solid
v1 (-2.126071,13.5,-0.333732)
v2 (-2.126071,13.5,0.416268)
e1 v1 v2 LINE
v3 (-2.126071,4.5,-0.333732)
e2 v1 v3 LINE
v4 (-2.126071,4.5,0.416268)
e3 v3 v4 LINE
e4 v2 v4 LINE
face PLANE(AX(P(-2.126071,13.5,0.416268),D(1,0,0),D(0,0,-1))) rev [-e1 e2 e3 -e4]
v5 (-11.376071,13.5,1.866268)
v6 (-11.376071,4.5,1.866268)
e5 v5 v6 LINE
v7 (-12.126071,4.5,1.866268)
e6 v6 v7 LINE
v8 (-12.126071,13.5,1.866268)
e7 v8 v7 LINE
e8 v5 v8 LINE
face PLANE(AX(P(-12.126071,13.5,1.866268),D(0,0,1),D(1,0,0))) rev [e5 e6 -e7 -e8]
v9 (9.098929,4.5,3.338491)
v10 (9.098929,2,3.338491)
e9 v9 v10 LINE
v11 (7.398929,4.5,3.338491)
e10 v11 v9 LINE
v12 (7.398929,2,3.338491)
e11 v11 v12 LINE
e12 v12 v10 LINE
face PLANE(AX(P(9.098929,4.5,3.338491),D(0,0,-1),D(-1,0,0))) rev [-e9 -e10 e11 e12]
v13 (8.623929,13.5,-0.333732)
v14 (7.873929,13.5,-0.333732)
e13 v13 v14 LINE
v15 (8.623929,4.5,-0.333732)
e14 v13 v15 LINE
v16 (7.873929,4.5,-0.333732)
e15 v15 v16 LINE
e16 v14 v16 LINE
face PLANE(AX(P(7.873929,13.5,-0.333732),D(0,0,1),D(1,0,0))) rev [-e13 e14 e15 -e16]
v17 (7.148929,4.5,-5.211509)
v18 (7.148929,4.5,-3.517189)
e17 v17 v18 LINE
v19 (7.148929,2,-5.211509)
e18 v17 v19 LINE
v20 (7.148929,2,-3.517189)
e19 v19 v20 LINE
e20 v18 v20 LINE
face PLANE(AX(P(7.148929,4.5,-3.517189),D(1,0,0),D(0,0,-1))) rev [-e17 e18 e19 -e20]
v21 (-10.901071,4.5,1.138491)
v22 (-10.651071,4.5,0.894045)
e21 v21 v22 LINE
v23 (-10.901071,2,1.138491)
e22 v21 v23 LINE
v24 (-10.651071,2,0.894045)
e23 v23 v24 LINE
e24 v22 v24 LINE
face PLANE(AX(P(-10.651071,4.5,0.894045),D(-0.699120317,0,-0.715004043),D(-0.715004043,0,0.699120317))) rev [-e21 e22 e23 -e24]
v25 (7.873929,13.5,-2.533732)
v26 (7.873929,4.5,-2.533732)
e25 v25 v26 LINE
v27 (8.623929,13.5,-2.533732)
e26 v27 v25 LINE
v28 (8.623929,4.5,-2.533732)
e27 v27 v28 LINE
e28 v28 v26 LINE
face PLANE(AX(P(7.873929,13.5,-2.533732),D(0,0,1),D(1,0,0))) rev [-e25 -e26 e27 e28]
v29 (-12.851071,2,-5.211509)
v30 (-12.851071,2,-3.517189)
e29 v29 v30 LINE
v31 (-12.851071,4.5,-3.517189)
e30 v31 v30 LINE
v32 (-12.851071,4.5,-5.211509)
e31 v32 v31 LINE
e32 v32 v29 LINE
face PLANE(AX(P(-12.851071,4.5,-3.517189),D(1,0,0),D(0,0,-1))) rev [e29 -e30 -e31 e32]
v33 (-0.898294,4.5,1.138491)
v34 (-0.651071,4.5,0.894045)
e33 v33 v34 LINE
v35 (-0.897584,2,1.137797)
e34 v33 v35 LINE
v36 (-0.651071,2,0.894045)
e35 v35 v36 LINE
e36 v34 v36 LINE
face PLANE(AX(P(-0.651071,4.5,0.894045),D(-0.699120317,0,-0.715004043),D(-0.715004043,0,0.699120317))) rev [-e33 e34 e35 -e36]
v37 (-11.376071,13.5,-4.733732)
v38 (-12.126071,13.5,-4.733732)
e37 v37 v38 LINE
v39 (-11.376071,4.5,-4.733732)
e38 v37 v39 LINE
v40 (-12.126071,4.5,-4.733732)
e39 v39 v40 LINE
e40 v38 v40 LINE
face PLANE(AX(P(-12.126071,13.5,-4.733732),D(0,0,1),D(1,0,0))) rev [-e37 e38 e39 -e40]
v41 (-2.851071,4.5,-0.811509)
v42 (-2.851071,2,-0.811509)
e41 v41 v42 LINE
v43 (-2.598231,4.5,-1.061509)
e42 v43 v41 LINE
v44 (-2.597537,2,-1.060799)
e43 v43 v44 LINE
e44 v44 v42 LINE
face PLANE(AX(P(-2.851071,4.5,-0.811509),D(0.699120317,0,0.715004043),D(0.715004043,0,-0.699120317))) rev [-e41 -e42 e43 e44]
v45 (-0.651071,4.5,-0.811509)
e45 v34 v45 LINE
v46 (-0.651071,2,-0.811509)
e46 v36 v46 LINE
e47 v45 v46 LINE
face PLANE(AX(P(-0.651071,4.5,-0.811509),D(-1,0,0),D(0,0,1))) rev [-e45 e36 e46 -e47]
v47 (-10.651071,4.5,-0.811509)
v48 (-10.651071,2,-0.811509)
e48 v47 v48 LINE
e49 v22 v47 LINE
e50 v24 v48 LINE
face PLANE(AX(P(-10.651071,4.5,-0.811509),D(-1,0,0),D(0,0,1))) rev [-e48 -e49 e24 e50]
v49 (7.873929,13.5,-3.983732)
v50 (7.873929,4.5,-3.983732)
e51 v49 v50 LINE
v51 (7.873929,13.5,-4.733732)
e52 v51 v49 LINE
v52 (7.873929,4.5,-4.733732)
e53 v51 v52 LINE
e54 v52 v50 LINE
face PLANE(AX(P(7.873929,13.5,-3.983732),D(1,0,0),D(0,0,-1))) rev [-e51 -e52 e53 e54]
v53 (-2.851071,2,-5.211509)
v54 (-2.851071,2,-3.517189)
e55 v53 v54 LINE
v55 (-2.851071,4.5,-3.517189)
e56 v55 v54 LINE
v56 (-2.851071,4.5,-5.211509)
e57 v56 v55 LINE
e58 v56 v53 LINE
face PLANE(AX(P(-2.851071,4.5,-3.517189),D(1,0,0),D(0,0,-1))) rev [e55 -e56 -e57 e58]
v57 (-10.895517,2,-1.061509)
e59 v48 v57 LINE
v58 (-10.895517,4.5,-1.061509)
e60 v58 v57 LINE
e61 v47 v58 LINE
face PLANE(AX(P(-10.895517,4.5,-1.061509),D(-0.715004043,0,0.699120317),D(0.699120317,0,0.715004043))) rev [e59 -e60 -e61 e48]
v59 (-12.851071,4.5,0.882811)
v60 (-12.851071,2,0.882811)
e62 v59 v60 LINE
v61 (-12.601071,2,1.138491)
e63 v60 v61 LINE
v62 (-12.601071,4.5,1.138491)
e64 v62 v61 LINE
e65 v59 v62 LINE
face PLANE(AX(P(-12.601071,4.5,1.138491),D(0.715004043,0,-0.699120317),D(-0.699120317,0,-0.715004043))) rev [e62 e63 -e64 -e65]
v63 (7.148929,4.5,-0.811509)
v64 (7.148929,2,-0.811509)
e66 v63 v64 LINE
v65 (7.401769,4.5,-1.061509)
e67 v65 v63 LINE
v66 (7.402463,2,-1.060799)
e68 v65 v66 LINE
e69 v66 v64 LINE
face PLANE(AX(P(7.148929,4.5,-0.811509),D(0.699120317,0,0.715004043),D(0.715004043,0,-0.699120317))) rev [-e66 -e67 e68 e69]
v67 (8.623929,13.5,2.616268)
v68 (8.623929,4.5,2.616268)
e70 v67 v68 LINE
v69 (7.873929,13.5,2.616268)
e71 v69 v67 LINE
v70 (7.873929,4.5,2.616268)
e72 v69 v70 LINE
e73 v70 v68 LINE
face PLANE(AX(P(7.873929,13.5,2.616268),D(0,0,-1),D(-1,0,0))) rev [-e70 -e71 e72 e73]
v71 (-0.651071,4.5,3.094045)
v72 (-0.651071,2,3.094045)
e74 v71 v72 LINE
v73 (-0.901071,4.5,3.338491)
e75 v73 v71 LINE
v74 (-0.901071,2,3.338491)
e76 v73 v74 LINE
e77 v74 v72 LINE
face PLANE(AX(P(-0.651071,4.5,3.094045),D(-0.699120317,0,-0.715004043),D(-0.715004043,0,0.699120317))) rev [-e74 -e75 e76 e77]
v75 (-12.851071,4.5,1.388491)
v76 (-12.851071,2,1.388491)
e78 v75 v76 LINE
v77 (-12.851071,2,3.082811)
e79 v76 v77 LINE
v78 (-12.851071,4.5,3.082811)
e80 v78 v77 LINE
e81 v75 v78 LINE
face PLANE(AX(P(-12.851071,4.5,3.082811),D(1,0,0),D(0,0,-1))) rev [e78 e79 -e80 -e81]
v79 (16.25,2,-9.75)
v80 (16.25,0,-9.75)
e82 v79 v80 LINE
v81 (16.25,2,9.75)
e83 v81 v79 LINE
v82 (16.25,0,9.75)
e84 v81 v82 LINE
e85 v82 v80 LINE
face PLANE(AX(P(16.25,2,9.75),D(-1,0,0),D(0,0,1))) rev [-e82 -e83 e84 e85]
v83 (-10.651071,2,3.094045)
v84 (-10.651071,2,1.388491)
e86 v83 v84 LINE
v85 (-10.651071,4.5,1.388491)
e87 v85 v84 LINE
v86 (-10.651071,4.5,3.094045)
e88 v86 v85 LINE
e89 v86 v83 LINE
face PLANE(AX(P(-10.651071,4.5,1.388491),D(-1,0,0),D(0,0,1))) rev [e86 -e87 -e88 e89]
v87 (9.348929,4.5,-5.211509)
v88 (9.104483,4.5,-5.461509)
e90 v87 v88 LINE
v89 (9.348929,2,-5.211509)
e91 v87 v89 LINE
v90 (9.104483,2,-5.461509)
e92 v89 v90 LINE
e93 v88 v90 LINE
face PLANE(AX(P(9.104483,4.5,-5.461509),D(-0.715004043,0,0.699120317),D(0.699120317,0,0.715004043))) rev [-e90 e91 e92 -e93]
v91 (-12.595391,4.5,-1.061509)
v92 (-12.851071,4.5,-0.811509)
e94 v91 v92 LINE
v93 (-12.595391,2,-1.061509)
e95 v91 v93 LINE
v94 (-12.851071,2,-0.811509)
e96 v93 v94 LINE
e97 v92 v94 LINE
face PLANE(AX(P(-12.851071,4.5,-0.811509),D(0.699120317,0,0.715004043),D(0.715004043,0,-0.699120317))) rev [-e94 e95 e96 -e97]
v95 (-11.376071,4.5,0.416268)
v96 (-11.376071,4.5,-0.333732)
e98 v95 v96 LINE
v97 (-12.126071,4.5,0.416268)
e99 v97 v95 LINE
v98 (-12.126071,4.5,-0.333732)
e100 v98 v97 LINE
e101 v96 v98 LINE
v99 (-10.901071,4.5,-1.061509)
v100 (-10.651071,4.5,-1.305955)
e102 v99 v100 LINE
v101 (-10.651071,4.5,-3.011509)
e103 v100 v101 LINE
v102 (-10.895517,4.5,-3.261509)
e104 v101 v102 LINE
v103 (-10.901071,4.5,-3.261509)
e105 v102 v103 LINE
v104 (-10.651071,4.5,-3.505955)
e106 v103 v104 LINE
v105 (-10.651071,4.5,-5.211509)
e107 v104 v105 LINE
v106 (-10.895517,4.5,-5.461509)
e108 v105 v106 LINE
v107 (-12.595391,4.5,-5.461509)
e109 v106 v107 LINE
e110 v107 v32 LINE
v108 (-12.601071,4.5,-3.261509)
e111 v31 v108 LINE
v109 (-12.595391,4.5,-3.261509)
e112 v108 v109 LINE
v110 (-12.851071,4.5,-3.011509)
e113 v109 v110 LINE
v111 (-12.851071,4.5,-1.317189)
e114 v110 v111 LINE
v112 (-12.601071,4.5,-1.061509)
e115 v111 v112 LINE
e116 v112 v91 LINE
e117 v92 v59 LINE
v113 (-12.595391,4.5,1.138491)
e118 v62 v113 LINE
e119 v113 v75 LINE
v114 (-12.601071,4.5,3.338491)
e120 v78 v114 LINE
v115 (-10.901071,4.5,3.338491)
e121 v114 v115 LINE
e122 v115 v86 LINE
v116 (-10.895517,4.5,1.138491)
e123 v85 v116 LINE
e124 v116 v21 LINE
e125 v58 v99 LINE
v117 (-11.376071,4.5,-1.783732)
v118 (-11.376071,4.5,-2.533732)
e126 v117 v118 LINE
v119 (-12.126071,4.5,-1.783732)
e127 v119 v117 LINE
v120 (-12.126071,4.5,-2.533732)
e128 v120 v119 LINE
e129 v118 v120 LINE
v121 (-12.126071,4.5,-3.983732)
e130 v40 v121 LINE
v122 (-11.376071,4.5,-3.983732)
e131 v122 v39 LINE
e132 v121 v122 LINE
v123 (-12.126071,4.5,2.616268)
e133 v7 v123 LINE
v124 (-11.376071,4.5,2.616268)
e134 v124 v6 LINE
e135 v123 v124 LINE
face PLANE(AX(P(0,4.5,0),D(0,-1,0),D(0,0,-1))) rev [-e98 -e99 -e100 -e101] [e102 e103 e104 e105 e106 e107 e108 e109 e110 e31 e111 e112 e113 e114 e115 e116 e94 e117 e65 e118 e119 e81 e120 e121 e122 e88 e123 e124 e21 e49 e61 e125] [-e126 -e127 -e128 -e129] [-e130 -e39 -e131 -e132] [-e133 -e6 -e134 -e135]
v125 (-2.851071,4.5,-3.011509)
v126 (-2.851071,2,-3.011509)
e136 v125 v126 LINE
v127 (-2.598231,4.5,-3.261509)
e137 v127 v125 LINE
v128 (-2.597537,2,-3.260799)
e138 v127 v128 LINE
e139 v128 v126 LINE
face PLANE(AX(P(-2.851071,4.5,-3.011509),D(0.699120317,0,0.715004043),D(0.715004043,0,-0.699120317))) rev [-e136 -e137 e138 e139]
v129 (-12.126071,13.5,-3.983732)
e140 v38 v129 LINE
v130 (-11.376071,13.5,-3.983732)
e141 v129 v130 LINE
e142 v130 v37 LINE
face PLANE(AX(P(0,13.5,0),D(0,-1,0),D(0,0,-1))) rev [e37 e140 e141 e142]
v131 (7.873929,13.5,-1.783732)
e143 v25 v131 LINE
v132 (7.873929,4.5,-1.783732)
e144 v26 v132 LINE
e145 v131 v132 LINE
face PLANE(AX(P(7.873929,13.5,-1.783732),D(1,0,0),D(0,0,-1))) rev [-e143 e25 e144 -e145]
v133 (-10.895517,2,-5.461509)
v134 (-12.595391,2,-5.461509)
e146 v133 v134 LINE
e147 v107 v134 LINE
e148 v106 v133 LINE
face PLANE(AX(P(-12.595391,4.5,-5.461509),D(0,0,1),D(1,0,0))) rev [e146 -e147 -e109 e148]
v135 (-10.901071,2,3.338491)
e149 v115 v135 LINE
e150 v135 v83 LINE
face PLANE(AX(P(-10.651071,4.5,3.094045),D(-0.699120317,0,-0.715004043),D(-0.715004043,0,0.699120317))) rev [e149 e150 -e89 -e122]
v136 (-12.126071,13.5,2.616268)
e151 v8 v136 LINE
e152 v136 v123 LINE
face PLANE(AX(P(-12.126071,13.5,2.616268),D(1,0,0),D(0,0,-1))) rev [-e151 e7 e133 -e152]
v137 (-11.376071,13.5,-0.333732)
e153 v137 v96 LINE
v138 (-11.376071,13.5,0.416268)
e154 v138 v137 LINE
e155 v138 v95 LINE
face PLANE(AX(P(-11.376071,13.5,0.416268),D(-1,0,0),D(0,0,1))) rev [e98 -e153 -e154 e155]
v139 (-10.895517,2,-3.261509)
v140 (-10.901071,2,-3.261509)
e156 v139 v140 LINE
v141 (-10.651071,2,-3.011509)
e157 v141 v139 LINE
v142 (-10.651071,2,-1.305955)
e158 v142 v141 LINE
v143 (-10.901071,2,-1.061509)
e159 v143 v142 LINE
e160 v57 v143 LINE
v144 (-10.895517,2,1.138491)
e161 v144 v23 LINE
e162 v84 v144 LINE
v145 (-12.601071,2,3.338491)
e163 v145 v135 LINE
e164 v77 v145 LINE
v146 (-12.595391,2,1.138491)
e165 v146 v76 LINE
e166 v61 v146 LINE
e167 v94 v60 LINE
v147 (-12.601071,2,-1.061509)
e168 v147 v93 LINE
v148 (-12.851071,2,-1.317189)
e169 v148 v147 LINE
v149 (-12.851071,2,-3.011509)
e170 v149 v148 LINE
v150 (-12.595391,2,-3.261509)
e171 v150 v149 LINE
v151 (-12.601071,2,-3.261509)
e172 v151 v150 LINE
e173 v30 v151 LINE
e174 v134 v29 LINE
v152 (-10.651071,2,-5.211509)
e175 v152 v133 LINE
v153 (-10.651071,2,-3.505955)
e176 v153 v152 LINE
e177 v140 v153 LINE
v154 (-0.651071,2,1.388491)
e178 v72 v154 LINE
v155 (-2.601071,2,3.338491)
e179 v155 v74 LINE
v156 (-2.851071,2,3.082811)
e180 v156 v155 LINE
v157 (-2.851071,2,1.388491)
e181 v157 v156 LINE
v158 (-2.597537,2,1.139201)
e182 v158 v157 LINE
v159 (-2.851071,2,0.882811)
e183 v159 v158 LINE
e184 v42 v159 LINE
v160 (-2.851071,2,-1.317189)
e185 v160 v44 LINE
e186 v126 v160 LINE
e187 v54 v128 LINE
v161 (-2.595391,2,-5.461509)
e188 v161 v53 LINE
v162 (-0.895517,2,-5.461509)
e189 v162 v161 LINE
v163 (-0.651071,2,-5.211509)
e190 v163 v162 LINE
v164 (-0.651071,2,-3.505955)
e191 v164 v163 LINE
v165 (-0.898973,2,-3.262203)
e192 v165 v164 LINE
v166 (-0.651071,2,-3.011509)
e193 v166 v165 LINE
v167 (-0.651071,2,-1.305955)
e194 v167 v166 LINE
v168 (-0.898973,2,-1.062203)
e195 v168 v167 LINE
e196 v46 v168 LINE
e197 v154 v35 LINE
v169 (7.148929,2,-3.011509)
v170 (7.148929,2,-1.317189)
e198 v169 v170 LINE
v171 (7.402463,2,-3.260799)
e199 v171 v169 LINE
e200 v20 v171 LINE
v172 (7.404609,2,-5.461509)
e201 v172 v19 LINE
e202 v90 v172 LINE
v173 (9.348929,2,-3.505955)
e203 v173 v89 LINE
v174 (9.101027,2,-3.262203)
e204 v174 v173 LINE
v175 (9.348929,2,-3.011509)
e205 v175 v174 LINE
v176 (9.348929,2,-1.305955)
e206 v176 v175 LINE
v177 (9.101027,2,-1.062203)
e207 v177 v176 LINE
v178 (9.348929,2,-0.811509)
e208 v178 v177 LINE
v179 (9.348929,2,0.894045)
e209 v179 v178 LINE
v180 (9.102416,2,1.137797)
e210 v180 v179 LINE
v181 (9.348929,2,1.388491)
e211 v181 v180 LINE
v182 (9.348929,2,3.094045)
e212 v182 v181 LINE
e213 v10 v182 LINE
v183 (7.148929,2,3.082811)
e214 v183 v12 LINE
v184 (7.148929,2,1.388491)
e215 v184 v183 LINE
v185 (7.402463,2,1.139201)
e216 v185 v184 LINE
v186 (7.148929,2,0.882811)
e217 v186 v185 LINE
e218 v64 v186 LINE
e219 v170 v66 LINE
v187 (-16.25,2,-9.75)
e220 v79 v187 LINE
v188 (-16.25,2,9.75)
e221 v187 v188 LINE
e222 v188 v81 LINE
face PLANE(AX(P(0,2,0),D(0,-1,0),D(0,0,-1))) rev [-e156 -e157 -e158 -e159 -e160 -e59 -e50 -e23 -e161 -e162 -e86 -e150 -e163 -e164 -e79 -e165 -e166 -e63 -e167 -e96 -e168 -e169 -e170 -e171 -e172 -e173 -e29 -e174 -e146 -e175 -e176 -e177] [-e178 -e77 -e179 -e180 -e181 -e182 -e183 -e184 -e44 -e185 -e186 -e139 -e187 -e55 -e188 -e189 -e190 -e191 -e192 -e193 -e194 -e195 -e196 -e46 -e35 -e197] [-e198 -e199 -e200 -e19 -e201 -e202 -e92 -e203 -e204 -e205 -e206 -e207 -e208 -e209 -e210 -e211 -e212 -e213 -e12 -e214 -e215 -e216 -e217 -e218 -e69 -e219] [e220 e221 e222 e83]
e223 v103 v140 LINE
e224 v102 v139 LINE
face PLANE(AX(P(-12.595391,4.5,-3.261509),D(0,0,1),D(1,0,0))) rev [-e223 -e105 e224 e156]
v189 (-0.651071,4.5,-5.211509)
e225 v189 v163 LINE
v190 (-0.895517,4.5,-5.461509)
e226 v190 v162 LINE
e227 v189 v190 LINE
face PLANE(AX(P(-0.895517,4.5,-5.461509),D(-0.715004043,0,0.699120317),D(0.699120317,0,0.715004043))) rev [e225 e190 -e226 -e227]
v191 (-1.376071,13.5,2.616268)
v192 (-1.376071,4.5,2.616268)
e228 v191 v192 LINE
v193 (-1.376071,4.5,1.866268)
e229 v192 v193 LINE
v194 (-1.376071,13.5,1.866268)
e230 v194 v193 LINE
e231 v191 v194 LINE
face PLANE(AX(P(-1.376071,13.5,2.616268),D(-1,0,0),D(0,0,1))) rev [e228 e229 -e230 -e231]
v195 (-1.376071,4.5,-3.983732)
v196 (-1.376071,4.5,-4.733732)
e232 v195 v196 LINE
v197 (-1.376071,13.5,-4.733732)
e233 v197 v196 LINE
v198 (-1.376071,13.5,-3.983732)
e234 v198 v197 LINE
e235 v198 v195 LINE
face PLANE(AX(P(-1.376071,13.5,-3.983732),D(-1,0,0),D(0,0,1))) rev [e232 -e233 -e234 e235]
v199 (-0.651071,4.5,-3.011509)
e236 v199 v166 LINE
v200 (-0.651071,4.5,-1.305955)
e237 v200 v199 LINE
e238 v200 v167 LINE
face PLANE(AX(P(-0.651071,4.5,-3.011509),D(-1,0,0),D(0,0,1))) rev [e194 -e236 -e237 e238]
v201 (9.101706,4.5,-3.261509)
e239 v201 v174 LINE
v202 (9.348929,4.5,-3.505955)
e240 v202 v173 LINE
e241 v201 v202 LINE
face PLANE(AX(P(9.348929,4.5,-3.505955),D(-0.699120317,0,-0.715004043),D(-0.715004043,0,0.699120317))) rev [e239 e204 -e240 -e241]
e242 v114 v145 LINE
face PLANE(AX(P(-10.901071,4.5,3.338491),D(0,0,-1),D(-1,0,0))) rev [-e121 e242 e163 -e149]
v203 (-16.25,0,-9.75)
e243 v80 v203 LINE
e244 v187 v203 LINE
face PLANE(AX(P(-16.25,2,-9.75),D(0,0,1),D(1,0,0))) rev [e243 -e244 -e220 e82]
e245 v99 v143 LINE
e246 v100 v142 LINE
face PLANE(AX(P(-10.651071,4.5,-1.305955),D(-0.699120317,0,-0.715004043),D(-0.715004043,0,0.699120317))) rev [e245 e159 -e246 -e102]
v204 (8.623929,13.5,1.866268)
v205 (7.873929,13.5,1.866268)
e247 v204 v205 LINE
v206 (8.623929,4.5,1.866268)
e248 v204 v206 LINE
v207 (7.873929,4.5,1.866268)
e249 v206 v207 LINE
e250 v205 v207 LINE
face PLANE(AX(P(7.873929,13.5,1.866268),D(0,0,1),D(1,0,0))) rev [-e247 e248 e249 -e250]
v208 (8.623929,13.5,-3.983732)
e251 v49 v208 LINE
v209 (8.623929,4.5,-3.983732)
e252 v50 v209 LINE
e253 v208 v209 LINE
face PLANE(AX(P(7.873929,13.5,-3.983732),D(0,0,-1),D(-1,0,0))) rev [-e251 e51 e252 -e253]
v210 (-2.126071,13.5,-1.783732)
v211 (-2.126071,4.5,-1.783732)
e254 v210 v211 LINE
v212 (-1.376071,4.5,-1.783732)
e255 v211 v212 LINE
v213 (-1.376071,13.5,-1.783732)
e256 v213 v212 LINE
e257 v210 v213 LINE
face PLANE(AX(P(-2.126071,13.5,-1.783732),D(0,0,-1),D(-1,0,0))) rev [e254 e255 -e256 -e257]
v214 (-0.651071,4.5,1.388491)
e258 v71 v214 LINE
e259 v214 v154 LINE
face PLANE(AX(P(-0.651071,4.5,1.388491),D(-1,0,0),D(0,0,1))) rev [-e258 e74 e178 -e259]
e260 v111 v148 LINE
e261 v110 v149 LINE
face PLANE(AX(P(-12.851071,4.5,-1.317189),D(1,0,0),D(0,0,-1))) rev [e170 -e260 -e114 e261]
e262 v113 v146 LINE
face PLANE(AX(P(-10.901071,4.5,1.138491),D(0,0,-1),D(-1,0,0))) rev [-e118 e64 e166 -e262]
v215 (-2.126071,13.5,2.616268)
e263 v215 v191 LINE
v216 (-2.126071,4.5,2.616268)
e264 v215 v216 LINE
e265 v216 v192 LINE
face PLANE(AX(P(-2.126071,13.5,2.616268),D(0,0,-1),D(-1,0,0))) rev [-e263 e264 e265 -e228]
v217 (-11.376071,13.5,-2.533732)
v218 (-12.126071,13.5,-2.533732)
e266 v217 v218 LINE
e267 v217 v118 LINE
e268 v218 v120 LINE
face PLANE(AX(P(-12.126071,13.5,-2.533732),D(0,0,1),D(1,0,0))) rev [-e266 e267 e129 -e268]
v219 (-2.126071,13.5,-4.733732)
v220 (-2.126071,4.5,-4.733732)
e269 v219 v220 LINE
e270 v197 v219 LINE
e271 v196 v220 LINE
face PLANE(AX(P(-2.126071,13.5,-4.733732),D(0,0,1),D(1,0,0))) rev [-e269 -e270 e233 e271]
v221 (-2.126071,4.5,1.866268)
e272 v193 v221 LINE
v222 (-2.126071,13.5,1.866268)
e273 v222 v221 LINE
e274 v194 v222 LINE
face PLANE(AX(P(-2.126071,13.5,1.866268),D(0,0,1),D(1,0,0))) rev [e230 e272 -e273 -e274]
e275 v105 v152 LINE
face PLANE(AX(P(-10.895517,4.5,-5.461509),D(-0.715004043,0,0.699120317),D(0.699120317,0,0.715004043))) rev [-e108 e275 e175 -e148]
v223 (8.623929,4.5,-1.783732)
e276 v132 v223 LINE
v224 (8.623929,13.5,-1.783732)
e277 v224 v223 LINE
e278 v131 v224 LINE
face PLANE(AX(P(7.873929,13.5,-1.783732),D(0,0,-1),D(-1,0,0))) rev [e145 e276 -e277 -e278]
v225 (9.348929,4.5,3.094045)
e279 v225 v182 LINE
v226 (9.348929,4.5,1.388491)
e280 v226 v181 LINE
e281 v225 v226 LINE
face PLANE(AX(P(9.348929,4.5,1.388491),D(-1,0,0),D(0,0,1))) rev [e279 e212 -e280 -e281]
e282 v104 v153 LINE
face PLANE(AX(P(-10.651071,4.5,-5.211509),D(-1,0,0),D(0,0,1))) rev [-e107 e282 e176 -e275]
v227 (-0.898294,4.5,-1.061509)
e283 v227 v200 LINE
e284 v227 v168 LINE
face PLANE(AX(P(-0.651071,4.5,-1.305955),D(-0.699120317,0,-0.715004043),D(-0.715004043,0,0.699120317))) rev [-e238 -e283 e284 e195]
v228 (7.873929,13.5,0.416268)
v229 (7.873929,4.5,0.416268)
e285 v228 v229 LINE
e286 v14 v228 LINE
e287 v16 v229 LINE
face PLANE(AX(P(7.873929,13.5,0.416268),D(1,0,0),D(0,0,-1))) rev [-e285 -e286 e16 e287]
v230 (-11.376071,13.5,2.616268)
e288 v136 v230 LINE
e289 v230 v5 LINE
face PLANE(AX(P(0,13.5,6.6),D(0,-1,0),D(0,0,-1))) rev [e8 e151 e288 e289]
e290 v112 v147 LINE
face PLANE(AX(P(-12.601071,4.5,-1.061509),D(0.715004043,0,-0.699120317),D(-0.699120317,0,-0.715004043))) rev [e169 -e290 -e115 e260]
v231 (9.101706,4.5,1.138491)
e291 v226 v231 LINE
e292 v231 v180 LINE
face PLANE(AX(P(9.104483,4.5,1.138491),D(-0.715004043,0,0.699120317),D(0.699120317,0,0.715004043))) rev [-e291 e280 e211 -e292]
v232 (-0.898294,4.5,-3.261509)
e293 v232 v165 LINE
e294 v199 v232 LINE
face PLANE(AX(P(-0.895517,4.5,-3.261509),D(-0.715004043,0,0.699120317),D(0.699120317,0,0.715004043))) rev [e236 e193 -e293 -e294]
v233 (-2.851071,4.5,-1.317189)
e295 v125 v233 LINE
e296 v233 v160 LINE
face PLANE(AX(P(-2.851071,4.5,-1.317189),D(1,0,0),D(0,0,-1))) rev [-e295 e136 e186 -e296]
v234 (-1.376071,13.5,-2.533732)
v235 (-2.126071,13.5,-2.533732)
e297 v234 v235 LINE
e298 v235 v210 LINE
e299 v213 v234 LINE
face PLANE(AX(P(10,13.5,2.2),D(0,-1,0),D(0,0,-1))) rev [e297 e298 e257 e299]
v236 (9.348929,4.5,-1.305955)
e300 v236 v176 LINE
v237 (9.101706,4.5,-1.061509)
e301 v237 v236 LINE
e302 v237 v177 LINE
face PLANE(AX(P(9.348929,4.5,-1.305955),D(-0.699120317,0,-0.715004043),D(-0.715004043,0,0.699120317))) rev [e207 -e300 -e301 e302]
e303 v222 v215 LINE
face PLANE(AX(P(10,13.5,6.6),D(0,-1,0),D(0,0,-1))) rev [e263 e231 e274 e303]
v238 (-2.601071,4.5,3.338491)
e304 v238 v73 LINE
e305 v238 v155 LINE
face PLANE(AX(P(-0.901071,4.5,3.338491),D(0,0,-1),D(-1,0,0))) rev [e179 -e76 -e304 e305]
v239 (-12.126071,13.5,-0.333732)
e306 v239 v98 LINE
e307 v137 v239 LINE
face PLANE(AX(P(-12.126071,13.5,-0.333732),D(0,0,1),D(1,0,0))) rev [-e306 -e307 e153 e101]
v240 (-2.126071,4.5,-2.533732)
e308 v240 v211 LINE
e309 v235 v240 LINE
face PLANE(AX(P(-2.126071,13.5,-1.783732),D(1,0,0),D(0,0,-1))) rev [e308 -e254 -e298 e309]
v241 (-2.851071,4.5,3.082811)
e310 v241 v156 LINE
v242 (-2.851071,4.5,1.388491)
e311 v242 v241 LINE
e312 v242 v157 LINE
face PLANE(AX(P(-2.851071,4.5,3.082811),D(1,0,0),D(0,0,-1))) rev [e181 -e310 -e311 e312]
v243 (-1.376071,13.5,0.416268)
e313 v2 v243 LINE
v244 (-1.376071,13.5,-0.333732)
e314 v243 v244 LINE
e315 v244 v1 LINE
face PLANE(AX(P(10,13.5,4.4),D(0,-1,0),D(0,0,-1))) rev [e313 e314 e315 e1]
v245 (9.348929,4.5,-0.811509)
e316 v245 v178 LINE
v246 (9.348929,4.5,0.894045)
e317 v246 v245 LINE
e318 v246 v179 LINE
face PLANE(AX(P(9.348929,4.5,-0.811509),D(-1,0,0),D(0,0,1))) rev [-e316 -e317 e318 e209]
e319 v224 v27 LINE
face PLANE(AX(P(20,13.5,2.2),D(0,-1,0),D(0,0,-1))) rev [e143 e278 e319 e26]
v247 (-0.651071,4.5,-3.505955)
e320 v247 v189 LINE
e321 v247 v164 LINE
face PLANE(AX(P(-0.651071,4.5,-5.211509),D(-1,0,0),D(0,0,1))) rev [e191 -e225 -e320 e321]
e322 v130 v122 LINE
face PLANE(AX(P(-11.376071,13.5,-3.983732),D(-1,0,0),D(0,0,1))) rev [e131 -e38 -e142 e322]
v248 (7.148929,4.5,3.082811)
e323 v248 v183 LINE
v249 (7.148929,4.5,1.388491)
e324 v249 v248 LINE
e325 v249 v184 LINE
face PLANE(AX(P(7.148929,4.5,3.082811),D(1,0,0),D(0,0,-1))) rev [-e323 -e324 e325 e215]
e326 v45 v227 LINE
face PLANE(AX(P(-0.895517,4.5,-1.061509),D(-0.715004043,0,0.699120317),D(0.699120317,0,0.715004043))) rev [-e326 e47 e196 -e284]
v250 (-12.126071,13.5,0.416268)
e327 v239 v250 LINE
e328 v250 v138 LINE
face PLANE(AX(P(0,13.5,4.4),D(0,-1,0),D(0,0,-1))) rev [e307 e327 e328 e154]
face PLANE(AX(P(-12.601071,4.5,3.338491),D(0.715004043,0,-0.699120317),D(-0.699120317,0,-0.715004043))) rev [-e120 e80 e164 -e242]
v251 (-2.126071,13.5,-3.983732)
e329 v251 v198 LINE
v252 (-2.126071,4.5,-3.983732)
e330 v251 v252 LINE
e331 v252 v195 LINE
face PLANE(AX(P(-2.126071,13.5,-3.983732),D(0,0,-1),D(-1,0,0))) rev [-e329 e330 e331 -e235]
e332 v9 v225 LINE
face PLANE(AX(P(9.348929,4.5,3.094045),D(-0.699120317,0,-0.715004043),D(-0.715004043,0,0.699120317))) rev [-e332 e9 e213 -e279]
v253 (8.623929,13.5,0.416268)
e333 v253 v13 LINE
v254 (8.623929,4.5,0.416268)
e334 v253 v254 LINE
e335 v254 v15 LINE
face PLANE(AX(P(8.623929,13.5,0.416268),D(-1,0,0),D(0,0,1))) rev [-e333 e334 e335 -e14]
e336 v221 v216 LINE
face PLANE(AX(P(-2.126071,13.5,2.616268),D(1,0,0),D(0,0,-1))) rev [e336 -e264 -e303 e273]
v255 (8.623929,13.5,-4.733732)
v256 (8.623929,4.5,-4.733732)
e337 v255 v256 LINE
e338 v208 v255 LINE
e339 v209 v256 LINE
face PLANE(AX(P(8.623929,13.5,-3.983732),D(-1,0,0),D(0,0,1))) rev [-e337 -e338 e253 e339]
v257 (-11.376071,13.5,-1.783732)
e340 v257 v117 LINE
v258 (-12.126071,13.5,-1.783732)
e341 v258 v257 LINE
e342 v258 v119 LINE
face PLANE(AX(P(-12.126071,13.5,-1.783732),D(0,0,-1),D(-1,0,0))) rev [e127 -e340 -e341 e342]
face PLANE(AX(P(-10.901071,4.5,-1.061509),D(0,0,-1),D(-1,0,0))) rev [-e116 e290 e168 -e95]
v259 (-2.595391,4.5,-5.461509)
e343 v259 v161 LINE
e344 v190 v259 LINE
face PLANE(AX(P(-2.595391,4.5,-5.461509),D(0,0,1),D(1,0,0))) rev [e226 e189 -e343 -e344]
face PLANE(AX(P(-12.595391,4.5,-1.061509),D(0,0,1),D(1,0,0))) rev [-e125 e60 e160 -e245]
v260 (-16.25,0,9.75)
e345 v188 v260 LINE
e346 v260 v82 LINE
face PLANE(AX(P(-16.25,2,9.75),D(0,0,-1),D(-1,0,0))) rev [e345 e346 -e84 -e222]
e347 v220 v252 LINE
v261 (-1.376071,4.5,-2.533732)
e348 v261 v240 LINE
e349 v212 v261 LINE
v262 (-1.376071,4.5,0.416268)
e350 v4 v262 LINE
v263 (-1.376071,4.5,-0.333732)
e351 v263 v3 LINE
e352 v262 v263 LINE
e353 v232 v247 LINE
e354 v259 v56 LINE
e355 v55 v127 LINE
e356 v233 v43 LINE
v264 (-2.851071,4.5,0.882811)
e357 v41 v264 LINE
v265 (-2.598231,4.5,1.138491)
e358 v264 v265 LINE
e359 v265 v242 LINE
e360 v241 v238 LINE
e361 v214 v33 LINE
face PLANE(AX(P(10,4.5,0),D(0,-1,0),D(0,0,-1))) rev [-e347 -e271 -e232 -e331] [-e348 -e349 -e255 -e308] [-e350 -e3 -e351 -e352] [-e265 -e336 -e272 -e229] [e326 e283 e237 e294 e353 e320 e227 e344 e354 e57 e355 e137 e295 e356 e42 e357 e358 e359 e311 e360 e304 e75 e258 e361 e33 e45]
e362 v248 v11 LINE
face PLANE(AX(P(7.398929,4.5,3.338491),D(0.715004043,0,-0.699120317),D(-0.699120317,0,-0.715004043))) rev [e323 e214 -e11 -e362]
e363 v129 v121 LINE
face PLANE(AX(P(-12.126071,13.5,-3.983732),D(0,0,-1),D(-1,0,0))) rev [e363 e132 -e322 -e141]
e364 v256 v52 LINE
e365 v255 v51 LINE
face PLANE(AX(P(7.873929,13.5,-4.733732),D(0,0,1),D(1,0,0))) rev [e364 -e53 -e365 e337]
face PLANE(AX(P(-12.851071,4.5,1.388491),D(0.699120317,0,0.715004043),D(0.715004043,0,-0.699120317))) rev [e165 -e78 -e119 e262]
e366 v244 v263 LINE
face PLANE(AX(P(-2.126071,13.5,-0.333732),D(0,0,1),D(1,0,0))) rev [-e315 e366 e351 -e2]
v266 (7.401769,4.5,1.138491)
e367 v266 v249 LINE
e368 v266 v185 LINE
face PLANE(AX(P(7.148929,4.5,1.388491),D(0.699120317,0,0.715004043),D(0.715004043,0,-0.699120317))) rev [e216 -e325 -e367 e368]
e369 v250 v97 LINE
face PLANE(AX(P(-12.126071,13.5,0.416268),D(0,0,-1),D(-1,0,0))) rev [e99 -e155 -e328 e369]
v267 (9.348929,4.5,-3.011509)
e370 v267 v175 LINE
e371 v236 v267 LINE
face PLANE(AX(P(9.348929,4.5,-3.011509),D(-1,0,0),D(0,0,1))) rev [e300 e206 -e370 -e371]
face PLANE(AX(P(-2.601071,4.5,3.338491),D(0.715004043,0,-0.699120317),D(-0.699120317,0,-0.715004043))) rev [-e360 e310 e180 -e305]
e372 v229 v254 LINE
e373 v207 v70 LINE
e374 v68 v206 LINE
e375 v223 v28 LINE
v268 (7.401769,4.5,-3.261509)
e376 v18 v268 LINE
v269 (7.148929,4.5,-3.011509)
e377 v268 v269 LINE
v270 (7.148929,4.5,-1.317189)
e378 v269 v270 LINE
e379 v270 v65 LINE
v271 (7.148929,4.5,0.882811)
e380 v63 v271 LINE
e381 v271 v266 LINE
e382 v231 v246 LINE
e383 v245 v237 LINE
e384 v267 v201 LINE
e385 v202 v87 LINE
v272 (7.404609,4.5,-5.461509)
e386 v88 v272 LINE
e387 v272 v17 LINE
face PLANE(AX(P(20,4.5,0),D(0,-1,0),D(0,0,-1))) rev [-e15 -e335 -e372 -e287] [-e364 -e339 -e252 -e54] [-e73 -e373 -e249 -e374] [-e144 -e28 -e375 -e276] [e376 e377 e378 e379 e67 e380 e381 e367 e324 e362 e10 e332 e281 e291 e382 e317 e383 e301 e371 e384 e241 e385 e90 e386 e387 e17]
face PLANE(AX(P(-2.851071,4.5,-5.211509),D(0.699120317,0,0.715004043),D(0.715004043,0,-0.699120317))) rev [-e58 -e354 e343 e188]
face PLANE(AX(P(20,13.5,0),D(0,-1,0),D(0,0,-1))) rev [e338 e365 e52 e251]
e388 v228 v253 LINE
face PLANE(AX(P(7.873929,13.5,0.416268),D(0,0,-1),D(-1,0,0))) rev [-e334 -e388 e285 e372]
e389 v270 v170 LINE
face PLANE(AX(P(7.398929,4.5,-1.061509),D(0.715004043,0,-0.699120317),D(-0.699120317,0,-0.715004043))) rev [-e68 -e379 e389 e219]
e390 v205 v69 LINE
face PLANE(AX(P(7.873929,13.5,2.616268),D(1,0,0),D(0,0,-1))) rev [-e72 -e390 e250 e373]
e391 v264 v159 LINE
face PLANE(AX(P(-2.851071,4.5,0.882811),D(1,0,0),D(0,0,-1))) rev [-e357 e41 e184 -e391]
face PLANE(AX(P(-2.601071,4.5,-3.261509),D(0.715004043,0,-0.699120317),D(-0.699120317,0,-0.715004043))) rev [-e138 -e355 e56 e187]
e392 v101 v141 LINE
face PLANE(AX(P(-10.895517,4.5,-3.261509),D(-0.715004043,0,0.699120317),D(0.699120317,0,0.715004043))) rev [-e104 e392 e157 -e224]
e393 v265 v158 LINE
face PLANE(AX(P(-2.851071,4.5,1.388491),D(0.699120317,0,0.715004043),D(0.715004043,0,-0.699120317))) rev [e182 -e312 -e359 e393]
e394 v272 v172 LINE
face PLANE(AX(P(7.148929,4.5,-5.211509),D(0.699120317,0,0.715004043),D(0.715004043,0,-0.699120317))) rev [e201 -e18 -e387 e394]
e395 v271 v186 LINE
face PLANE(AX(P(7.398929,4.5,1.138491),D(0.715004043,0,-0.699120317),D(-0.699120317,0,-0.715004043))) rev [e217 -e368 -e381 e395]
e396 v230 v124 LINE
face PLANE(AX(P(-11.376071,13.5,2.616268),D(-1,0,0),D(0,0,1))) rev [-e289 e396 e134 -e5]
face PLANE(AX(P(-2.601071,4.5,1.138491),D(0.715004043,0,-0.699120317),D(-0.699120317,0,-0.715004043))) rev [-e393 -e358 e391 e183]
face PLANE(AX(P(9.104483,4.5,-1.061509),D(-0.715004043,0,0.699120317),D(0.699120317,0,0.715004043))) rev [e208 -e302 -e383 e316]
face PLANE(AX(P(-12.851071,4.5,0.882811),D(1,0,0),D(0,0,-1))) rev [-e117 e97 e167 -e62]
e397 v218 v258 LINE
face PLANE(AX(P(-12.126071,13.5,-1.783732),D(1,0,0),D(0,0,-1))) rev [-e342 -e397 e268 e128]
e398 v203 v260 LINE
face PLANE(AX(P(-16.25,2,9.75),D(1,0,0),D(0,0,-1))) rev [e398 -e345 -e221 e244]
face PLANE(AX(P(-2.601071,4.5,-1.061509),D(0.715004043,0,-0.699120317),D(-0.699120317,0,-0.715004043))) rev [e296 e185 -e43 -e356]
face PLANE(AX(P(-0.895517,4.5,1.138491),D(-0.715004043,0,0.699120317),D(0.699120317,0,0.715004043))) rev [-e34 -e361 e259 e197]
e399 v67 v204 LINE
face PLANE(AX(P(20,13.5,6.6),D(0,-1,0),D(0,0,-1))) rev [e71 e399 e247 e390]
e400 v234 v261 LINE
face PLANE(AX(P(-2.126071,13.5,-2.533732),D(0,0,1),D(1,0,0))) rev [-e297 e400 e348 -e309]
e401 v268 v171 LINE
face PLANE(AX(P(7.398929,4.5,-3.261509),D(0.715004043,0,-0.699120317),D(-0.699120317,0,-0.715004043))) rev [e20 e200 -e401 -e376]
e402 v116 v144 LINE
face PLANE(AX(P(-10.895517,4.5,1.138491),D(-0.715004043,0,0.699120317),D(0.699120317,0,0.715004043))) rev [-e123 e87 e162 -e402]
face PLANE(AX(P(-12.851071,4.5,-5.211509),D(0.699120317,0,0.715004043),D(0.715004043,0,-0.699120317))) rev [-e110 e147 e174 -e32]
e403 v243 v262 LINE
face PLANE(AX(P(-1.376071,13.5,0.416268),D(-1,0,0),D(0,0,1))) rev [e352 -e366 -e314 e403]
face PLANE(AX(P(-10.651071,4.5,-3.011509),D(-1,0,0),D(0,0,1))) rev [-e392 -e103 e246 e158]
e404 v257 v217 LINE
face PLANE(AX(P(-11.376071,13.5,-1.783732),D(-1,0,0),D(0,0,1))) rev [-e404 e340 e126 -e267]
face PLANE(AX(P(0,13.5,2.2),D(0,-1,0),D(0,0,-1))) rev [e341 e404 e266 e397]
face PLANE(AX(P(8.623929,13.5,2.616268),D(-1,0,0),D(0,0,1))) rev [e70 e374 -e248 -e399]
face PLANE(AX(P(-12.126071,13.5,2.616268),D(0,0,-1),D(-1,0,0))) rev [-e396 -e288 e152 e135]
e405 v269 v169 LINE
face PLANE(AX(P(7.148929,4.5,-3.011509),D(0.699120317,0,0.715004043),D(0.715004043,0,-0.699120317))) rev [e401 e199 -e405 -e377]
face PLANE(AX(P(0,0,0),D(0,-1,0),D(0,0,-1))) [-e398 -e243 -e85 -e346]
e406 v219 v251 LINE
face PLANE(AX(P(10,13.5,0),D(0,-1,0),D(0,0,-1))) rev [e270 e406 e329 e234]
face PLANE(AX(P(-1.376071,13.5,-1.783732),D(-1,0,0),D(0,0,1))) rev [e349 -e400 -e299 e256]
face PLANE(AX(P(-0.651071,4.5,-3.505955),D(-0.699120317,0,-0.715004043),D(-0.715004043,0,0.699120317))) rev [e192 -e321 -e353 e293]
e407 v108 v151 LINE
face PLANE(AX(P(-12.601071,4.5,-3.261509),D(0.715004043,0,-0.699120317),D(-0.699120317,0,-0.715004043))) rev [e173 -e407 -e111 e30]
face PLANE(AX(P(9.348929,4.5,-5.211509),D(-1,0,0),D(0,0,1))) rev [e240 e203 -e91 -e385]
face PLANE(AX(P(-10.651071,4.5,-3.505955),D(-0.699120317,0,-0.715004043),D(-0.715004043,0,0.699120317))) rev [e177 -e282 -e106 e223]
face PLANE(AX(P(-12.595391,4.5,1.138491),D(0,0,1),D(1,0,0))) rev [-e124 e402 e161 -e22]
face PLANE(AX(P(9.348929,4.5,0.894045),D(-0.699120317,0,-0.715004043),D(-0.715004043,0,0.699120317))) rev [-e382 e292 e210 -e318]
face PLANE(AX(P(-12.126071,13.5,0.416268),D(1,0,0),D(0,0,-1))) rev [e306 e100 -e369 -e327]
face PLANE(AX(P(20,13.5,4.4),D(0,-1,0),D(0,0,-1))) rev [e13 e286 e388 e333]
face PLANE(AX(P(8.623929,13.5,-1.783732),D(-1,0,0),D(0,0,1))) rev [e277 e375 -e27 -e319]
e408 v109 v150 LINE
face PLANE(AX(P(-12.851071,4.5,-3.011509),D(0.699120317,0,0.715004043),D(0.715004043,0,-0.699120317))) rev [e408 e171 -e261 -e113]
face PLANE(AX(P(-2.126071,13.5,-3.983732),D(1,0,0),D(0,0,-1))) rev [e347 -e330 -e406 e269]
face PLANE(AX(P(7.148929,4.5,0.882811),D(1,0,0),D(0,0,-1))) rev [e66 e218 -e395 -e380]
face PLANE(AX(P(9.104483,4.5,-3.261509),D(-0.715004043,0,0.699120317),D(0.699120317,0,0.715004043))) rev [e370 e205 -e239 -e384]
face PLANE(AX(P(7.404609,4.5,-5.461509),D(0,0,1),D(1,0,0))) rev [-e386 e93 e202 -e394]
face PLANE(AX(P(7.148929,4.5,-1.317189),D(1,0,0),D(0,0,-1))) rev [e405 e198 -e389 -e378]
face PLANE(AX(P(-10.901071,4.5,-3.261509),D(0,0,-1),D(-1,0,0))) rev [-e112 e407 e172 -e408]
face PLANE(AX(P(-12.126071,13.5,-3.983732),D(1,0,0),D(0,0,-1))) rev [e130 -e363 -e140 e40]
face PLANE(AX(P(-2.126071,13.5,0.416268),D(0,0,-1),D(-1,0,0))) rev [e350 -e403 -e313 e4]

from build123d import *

# Parameters (mm, degrees)
ESBO_O1_W                  = 32.5
ESBO_O1_H                  = 19.5
RESSALTO_EXTRUS_O1_DEPTH   = 2
RESSALTO_EXTRUS_O2_DEPTH   = 2.5
ESBO_O3_W                  = 0.75
ESBO_O3_H                  = 0.75
RESSALTO_EXTRUS_O3_DEPTH   = 9
PADR_O_LINEAR1_COUNT       = 4
PADR_O_LINEAR1_PITCH       = 2.2
PADR_O_START               = 2
PADR_O_LINEAR2_DEPTH       = 2.5
PADR_O_START_2             = 4.5
PADR_O_LINEAR2_2_OUTLINE_W = 0.75
PADR_O_LINEAR2_2_OUTLINE_H = 0.75
PADR_O_LINEAR2_2_DEPTH     = 9


# Read off the part's stored shape, not the designer's step: Padrão linear2
with BuildPart() as part:
    # Esboço1 → Ressalto-extrusão1 (new body)
    with BuildSketch(Plane(origin=(0, 0, 0), x_dir=(1, 0, 0), z_dir=(0, 1, 0))):
        Rectangle(ESBO_O1_W, ESBO_O1_H)
    extrude(amount=RESSALTO_EXTRUS_O1_DEPTH)

    # Esboço2 → Ressalto-extrusão2 (add)
    with BuildSketch(Plane(origin=(0, 2, 0), x_dir=(1, 0, 0), z_dir=(0, 1, 0))):
        Polygon((-12.851070796, 5.211508821), (-12.595390899, 5.461508821), (-10.895517077, 5.461508821), (-10.651070796, 5.211508821), (-10.651070796, 3.505955102), (-10.901070796, 3.261508821), (-12.601070796, 3.261508821), (-12.851070796, 3.517188718), align=None)
    ressalto_extrus_o2 = extrude(amount=RESSALTO_EXTRUS_O2_DEPTH)

    # Esboço3 → Ressalto-extrusão3 (add)
    with BuildSketch(Plane(origin=(0, 4.5, 0), x_dir=(1, 0, 0), z_dir=(0, 1, 0))):
        with Locations((-11.751070796, 4.358731961)):
            Rectangle(ESBO_O3_W, ESBO_O3_H)
    ressalto_extrus_o3 = extrude(amount=RESSALTO_EXTRUS_O3_DEPTH)

    # Padrão linear1: Ressalto-extrusão2, Ressalto-extrusão3 ×4
    with Locations(*[(0, 0, i * PADR_O_LINEAR1_PITCH) for i in range(1, PADR_O_LINEAR1_COUNT)]):
        add(ressalto_extrus_o2)
        add(ressalto_extrus_o3)

    # Padrão linear2 outline → Padrão linear2 (add)
    with BuildSketch(Plane(origin=(0, 0, 0), x_dir=(1, 0, 0), z_dir=(0, 1, 0)).offset(PADR_O_START)):
        Polygon((-0.895517077, 5.461508821), (-2.595390899, 5.461508821), (-2.851070796, 5.211508821), (-2.851070796, 3.517188718), (-2.598294638, 3.258669589), (-2.851070796, 3.011508821), (-2.851070796, 1.317188718), (-2.598294638, 1.058669589), (-2.851070796, 0.811508821), (-2.851070796, -0.882811282), (-2.598294638, -1.141330411), (-2.851070796, -1.388491179), (-2.851070796, -3.082811282), (-2.601070796, -3.338491179), (-0.901070796, -3.338491179), (-0.651070796, -3.094044898), (-0.651070796, -1.388491179), (-0.898231564, -1.13571502), (-0.651070796, -0.894044898), (-0.651070796, 0.811508821), (-0.898231564, 1.06428498), (-0.651070796, 1.305955102), (-0.651070796, 3.011508821), (-0.898231564, 3.26428498), (-0.651070796, 3.505955102), (-0.651070796, 5.211508821), align=None)
        Polygon((9.104482923, 5.461508821), (7.404609101, 5.461508821), (7.148929204, 5.211508821), (7.148929204, 3.517188718), (7.401705362, 3.258669589), (7.148929204, 3.011508821), (7.148929204, 1.317188718), (7.401705362, 1.058669589), (7.148929204, 0.811508821), (7.148929204, -0.882811282), (7.401705362, -1.141330411), (7.148929204, -1.388491179), (7.148929204, -3.082811282), (7.398929204, -3.338491179), (9.098929204, -3.338491179), (9.348929204, -3.094044898), (9.348929204, -1.388491179), (9.101768436, -1.13571502), (9.348929204, -0.894044898), (9.348929204, 0.811508821), (9.101768436, 1.06428498), (9.348929204, 1.305955102), (9.348929204, 3.011508821), (9.101768436, 3.26428498), (9.348929204, 3.505955102), (9.348929204, 5.211508821), align=None)
    extrude(amount=PADR_O_LINEAR2_DEPTH)

    # Padr_o linear2 2 outline → Padr_o linear2 2 (add)
    with BuildSketch(Plane(origin=(0, 0, 0), x_dir=(1, 0, 0), z_dir=(0, 1, 0)).offset(PADR_O_START_2)):
        with Locations((-1.751070796, 4.358731961)):
            Rectangle(PADR_O_LINEAR2_2_OUTLINE_W, PADR_O_LINEAR2_2_OUTLINE_H)
        with Locations((8.248929204, 4.358731961)):
            Rectangle(PADR_O_LINEAR2_2_OUTLINE_W, PADR_O_LINEAR2_2_OUTLINE_H)
        with Locations((-1.751070796, 2.158731961)):
            Rectangle(PADR_O_LINEAR2_2_OUTLINE_W, PADR_O_LINEAR2_2_OUTLINE_H)
        with Locations((8.248929204, 2.158731961)):
            Rectangle(PADR_O_LINEAR2_2_OUTLINE_W, PADR_O_LINEAR2_2_OUTLINE_H)
        with Locations((-1.751070796, -0.041268039)):
            Rectangle(PADR_O_LINEAR2_2_OUTLINE_W, PADR_O_LINEAR2_2_OUTLINE_H)
        with Locations((8.248929204, -0.041268039)):
            Rectangle(PADR_O_LINEAR2_2_OUTLINE_W, PADR_O_LINEAR2_2_OUTLINE_H)
        with Locations((-1.751070796, -2.241268039)):
            Rectangle(PADR_O_LINEAR2_2_OUTLINE_W, PADR_O_LINEAR2_2_OUTLINE_H)
        with Locations((8.248929204, -2.241268039)):
            Rectangle(PADR_O_LINEAR2_2_OUTLINE_W, PADR_O_LINEAR2_2_OUTLINE_H)
    extrude(amount=PADR_O_LINEAR2_2_DEPTH)


solid = part.part
